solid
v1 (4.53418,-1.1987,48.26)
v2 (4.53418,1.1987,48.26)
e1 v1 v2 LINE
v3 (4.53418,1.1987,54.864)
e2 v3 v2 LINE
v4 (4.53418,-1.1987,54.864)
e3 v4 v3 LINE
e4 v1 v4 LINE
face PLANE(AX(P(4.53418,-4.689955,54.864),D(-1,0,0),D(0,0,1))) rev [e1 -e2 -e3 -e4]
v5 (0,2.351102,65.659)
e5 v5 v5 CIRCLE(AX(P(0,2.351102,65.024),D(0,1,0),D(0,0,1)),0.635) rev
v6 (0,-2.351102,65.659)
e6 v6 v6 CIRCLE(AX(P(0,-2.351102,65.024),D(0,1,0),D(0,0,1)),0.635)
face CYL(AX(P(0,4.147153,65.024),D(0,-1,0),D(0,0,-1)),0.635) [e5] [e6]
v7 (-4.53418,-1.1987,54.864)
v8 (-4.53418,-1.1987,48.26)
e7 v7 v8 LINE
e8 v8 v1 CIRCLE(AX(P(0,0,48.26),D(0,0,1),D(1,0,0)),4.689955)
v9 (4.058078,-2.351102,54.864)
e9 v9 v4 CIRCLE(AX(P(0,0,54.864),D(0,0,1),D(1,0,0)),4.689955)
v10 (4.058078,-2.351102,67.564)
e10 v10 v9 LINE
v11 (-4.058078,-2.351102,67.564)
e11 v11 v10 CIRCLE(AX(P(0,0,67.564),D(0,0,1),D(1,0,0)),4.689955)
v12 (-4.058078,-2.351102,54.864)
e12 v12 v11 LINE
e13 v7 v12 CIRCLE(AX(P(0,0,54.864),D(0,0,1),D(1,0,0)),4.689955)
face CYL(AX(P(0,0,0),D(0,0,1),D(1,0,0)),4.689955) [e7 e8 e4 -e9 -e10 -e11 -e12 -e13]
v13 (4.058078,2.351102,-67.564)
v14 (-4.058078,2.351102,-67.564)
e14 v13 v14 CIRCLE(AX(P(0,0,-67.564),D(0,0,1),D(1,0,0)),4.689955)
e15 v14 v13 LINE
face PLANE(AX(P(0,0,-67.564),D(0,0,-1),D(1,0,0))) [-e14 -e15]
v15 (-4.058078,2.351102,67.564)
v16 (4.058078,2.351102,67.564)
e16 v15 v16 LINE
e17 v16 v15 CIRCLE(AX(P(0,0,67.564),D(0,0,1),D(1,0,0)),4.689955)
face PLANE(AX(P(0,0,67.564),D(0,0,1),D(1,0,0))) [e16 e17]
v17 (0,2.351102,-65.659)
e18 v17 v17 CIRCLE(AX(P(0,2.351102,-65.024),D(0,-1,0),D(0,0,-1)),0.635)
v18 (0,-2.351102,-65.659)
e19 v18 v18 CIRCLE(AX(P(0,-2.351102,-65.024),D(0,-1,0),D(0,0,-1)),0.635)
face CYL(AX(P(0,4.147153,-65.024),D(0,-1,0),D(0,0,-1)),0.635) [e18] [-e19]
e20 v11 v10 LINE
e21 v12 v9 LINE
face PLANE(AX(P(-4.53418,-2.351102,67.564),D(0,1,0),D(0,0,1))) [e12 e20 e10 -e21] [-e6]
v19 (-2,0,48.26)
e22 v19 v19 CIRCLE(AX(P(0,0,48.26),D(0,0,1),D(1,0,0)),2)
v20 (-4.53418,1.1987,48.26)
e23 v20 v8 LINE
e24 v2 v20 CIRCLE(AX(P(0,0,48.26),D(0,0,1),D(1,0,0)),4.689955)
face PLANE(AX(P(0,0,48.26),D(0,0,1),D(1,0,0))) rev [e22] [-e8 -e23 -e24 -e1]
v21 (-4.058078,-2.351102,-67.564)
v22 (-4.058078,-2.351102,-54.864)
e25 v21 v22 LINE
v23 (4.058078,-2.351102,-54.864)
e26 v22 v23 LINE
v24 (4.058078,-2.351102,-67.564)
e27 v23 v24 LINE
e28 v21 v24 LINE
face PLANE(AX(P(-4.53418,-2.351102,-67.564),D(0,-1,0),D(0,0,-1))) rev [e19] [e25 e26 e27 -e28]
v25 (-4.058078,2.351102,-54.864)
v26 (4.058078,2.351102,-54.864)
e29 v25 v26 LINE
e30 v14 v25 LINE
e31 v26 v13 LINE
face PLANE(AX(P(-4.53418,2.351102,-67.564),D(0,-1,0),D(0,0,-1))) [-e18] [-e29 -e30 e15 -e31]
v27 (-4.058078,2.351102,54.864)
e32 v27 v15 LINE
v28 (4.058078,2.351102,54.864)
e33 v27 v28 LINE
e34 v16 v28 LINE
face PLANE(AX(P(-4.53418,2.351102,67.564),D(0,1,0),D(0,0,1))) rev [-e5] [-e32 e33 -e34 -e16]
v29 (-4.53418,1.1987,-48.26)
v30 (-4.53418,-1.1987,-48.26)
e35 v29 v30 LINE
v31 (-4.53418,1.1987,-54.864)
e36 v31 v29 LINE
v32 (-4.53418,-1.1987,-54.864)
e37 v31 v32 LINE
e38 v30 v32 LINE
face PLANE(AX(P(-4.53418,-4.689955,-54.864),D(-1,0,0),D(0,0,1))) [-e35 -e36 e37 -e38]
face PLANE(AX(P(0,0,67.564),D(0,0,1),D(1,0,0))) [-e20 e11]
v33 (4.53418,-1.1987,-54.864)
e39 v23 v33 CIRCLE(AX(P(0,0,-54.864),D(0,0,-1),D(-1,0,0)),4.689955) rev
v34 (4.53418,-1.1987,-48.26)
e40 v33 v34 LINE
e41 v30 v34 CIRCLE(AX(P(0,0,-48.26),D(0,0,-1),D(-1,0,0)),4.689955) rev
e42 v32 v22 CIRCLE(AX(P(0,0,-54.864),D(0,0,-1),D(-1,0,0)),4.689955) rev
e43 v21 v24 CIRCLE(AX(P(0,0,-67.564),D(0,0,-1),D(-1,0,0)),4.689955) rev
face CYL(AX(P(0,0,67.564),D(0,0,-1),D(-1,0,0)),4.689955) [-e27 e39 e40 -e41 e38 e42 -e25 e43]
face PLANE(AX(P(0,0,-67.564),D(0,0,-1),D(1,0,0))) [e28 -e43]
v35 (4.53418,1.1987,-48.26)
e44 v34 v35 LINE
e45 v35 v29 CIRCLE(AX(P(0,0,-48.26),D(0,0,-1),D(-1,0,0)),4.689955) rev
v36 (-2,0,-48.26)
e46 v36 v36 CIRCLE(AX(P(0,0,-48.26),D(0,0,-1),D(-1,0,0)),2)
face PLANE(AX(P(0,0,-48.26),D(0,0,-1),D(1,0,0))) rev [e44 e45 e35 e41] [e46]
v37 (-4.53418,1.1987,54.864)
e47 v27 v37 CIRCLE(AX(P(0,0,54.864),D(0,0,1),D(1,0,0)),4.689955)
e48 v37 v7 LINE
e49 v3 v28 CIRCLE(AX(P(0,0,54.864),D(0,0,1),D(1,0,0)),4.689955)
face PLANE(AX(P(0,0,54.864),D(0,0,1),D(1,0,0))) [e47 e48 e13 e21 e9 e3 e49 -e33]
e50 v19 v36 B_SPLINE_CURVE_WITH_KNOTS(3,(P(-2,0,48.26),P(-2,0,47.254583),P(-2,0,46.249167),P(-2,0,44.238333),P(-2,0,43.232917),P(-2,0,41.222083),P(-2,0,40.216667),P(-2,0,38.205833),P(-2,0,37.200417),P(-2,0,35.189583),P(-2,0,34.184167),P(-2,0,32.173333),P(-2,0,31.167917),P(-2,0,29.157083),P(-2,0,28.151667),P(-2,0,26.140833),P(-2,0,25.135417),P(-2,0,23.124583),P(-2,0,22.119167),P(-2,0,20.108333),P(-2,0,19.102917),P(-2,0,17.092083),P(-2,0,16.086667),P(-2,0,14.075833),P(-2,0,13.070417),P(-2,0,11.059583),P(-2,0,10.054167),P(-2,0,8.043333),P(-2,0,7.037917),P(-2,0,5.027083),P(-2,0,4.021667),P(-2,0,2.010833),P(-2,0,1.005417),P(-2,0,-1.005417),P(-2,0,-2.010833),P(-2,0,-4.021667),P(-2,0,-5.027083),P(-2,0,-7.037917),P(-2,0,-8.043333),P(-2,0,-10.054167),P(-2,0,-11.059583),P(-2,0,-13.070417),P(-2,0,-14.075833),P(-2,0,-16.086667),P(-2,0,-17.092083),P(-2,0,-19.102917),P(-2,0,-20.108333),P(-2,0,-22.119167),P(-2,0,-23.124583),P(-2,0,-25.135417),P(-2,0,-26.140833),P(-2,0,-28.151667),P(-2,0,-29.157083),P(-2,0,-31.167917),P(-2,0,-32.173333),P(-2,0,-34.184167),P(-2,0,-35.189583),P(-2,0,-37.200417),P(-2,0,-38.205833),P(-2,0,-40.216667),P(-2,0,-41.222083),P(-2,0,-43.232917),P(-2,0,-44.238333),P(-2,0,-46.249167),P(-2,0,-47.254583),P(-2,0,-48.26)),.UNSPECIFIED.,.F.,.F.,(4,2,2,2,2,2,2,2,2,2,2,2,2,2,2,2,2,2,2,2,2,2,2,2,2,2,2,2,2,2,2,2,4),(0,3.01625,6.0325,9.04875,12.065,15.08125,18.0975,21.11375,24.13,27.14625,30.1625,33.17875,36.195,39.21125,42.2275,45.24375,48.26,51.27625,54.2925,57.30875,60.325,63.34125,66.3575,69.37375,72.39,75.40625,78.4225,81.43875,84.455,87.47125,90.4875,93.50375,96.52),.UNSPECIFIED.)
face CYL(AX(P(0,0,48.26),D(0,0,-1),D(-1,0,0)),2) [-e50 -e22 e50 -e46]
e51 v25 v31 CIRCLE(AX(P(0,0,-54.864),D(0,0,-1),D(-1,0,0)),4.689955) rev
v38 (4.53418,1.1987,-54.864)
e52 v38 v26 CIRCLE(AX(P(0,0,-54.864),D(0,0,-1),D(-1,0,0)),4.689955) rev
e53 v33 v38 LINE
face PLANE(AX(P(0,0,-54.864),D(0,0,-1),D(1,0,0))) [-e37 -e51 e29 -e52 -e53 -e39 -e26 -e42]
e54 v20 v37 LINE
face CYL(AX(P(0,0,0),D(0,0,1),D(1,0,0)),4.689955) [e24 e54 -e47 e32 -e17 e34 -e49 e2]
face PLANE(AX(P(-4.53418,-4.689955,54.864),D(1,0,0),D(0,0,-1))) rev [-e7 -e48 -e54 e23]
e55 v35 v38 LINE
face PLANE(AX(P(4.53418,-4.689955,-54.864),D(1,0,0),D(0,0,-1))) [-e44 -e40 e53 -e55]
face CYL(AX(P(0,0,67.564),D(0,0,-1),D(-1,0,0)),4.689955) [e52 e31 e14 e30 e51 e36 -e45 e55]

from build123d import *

# Parameters (mm, degrees)
SKETCH1_R           = 2
BOSS_EXTRUDE1_DEPTH = 48.26
SKETCH2_W           = 9.068360996
SKETCH2_H           = 9.379909118
BOSS_EXTRUDE2_DEPTH = 6.604
SKETCH3_W           = 9.068360996
SKETCH3_H           = 2.338852908
BOSS_EXTRUDE3_DEPTH = 12.7
SKETCH5_OUTSIDE_W   = 24.83
SKETCH5_OUTSIDE_H   = 25.142
SKETCH5_OUTSIDE_R   = 4.689954559
CUT_EXTRUDE2_DEPTH  = 68.878189152
SKETCH6_R           = 0.635
BOSS_EXTRUDE4_DEPTH = 4.702203303


# Read off the part's stored shape, not the designer's step: Mirror4
with BuildPart() as part:
    # Sketch1 → Boss-Extrude1 (new body)
    with BuildSketch(Plane.XY):
        with Locations(Location((0, 0, 0), (0, 0, 180))):
            Circle(SKETCH1_R)
    extrude(amount=BOSS_EXTRUDE1_DEPTH)

    # Sketch2 → Boss-Extrude2 (add)
    with BuildSketch(Plane.XY.offset(48.26)):
        Rectangle(SKETCH2_W, SKETCH2_H)
    extrude(amount=BOSS_EXTRUDE2_DEPTH)

    # Sketch3 → Boss-Extrude3 (add)
    with BuildSketch(Plane.XY.offset(54.864)):
        with Locations((0, 3.520528105)):
            Rectangle(SKETCH3_W, SKETCH3_H)
    boss_extrude3 = extrude(amount=BOSS_EXTRUDE3_DEPTH)

    # Mirror1: Boss-Extrude3 across plane
    add(boss_extrude3.mirror(Plane.ZX))

    # Sketch5 outside → Cut-Extrude2 (cut, through all)
    with BuildSketch(Plane.XY.offset(67.564)):
        Rectangle(SKETCH5_OUTSIDE_W, SKETCH5_OUTSIDE_H)
        Circle(SKETCH5_OUTSIDE_R, mode=Mode.SUBTRACT)
    extrude(amount=-CUT_EXTRUDE2_DEPTH, mode=Mode.SUBTRACT)

    # Sketch6 → Boss-Extrude4 (add)
    with BuildSketch(Plane(origin=(0, -2.351101651, 0), x_dir=(1, 0, 0), z_dir=(0, 1, 0))):
        with Locations(Location((0, -65.024, 0), (0, 0, 270))):
            Circle(SKETCH6_R)
    extrude(amount=BOSS_EXTRUDE4_DEPTH)

    # Mirror4: part across plane


with BuildPart() as part_1:
    add(part.part)
    add(part.part.mirror(Plane(origin=(0, 0, 0), x_dir=(1, 0, 0), z_dir=(0, 0, -1))))


solid = part_1.part
